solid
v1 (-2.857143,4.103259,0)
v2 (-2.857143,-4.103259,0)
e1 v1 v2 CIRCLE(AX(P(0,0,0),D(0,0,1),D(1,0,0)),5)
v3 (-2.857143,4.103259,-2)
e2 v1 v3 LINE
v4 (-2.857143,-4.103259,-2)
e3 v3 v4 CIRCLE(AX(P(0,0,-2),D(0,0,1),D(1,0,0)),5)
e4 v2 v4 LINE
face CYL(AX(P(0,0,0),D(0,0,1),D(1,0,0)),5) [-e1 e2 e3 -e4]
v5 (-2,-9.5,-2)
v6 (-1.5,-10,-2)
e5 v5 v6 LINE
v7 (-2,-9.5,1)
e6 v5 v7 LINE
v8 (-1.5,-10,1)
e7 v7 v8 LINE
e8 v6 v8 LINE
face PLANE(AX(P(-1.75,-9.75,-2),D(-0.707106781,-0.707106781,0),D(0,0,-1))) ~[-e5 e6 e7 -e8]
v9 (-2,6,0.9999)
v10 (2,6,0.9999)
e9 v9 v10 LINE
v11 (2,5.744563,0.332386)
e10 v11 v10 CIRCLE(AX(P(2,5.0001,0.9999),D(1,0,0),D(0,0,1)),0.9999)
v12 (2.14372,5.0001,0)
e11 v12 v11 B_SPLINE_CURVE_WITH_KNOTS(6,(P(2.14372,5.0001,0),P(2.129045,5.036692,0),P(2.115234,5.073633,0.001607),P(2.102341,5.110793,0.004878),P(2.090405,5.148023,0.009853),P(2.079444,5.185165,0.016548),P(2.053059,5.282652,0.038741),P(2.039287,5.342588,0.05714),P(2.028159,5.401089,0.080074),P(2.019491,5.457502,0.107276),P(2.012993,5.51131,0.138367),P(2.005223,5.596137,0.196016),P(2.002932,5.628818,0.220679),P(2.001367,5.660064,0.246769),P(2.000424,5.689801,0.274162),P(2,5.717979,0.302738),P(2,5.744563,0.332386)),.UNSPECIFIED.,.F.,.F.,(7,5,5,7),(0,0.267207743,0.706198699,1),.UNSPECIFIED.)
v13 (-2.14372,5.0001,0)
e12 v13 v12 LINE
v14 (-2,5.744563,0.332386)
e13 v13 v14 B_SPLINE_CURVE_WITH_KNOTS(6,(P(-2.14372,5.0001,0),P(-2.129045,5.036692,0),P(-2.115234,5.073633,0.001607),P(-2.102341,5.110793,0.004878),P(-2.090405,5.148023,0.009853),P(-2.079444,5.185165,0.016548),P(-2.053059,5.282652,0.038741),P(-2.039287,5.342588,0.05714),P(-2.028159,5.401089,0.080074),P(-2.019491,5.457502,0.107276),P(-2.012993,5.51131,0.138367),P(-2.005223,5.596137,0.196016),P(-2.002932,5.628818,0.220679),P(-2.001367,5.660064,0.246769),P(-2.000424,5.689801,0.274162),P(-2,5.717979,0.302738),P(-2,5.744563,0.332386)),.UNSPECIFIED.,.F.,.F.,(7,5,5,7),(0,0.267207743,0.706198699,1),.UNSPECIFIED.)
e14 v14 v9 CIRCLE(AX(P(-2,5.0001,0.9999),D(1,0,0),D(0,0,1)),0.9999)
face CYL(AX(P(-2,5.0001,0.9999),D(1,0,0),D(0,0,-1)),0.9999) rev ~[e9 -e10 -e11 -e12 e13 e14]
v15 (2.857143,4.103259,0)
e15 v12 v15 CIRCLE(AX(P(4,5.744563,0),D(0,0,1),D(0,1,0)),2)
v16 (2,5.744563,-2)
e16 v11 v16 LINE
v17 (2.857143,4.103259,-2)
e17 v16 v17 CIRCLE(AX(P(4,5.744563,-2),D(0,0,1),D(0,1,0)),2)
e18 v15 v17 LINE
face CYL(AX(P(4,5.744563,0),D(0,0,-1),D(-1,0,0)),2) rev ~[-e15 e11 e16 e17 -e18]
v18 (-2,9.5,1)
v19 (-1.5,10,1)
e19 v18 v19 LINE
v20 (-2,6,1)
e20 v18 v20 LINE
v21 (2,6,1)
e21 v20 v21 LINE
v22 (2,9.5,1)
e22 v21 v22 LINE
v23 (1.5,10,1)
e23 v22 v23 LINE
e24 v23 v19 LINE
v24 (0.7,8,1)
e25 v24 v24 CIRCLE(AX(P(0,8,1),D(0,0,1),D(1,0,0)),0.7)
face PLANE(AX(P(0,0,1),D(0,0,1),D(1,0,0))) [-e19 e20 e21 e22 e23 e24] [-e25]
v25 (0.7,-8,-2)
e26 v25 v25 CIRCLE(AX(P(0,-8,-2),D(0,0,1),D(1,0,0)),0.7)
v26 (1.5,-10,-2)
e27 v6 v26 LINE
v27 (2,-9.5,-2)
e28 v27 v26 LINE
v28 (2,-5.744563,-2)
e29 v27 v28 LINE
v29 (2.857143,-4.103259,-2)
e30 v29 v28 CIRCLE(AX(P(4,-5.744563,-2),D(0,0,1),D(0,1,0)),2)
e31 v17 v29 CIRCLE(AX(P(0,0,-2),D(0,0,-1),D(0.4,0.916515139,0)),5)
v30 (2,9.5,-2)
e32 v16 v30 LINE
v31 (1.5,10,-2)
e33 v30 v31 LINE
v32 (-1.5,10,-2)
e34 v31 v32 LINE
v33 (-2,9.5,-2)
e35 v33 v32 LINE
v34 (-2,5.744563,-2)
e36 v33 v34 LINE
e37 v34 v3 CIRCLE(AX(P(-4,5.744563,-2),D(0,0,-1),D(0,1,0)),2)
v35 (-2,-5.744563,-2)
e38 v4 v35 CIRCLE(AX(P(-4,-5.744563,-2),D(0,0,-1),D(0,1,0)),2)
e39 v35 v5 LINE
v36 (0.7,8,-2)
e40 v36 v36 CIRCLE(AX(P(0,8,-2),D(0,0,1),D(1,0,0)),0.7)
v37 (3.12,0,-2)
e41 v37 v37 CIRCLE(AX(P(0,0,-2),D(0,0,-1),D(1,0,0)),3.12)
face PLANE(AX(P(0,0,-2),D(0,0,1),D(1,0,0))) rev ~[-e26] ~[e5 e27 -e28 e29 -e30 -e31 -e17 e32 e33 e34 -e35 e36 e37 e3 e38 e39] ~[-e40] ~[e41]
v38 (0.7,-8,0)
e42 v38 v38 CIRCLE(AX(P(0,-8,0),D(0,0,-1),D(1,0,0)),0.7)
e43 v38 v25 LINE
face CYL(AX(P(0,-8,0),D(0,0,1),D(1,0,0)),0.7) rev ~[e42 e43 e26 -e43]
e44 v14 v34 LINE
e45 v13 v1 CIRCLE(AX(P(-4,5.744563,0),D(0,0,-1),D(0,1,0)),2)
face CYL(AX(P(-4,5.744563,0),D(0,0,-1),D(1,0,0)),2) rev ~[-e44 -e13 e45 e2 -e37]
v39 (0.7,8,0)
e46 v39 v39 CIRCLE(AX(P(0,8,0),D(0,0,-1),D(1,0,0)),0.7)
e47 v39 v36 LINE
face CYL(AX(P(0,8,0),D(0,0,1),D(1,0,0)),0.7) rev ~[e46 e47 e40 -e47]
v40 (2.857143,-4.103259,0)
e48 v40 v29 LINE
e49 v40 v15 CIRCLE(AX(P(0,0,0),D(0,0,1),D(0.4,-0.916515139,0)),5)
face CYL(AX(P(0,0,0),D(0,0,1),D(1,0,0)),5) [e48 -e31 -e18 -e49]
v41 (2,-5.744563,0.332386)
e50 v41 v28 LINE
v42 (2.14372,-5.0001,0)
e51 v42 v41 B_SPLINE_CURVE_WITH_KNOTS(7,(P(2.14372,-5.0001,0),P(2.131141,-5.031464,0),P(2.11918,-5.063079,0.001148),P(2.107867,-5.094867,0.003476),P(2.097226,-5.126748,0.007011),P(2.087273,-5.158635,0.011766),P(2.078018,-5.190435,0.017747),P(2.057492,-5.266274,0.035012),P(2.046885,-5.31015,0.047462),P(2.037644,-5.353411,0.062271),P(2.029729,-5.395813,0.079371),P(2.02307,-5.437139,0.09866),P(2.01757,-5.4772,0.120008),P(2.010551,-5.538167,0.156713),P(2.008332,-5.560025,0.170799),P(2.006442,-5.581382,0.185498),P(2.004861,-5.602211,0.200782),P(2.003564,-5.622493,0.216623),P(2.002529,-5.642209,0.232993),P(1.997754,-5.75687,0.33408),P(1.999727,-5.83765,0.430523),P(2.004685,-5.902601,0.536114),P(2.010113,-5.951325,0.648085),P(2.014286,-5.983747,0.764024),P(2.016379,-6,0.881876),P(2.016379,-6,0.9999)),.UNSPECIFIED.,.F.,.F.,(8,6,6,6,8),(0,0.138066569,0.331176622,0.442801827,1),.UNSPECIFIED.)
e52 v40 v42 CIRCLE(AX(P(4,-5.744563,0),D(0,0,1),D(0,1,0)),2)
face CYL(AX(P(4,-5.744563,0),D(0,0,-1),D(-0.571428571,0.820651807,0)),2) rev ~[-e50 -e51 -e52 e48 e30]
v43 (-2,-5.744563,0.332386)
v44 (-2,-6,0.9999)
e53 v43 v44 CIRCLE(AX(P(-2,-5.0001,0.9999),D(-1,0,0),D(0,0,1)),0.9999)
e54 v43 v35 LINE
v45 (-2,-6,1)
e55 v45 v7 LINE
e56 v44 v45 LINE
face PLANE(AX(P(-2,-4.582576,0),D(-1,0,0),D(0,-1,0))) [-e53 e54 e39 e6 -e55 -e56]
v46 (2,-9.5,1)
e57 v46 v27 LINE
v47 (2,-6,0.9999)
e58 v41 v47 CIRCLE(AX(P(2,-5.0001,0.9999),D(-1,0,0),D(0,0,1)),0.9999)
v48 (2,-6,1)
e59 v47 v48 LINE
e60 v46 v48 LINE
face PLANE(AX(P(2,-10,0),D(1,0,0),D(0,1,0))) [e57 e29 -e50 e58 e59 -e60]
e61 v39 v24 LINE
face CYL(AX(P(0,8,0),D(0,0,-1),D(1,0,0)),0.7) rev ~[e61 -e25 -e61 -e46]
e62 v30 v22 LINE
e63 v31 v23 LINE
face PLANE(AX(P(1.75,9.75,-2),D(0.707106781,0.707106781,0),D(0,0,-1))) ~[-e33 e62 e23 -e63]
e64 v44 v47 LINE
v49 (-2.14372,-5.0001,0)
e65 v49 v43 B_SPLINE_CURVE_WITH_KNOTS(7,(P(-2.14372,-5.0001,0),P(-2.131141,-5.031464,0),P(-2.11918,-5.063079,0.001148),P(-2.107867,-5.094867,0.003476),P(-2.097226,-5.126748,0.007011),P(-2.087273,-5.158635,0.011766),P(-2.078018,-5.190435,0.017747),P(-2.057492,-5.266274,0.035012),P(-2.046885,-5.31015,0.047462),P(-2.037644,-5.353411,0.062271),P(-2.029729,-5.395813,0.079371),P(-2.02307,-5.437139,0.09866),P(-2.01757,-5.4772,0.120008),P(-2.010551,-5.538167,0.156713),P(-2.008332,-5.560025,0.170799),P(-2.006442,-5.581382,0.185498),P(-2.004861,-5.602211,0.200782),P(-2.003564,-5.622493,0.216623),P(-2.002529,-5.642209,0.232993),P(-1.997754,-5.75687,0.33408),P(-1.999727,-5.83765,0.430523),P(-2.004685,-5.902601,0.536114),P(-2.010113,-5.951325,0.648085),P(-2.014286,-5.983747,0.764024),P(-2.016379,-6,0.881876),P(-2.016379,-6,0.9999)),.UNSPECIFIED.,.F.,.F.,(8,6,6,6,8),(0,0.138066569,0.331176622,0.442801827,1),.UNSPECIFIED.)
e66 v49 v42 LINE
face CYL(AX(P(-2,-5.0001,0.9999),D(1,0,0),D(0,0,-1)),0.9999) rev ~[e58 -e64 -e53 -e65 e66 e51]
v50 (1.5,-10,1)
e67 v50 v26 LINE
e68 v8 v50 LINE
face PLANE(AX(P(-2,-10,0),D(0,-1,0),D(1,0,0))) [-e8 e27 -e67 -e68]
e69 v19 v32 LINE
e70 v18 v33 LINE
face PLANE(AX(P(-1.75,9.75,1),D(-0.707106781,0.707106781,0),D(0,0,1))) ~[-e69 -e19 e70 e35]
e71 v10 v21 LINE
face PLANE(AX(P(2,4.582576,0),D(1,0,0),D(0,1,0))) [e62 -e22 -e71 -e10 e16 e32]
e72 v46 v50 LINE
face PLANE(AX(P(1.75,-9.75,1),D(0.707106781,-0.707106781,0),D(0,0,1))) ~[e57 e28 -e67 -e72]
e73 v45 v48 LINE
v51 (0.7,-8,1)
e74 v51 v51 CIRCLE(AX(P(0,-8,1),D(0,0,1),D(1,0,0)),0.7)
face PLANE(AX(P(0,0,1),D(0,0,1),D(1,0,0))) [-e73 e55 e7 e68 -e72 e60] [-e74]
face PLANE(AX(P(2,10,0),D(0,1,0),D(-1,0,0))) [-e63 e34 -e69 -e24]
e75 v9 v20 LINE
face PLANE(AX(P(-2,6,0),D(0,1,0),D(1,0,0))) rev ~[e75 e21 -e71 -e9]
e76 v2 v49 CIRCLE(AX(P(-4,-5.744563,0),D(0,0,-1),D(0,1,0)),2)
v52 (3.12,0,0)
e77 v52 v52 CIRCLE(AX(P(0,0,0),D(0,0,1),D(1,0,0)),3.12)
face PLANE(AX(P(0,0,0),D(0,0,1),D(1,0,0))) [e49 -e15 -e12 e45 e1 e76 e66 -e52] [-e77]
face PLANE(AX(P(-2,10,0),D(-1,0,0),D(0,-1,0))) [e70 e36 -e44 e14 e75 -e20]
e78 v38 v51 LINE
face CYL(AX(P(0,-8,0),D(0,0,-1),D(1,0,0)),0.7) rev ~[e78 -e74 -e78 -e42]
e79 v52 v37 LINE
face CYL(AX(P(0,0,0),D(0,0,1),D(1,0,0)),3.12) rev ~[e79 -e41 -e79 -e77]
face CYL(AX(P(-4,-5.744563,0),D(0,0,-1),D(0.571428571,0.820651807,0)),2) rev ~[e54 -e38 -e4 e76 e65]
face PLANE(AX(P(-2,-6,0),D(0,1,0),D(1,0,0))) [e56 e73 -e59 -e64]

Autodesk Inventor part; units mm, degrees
ref_plane "YZ Plane" through (0, 0, 0) normal (1, 0, 0) x (0, 1, 0)
ref_plane "XZ Plane" through (0, 0, 0) normal (0, 1, 0) x (-1, 0, 0)
ref_plane "XY Plane" through (0, 0, 0) normal (0, 0, 1) x (1, 0, 0)
sketch "Sketch1" plane through (0, 0, 0) normal (0, 0, 1) x (1, 0, 0)
  circle A0 centre (0, 0) radius 3 projected
  circle A1 centre (0, 0) radius 3
  circle A2 centre (0, 0) radius 5
  line L0 (0, 0) -> (0, 8)
  circle A3 centre (0, 8) radius 0.7
  line L1 (0, 0) -> (0, -8)
  circle A4 centre (0, -8) radius 0.7
  line L2 (-2, -10) -> (2, -10)
  line L3 (2, -10) -> (2, 10)
  line L4 (2, 10) -> (-2, 10)
  line L5 (-2, 10) -> (-2, -10)
  line L6 (-2, -10) -> (2, 10) construction
  line L7 (2, -10) -> (-2, 10) construction
  point P0 (-2, -4.5826)
  point P1 (2, -4.5826)
  point P2 (2, 4.5826)
  point P3 (-2, 4.5826)
  dimension "d0" = 6
  dimension "d1" = 10
  dimension "d2" = 8
  dimension "d3" = 1.4
  dimension "d4" = 8
  dimension "d5" = 1.4
  dimension "d6" = 4
  dimension "d7" = 20
extrude "Extrusion1" add sketch "Sketch1" against normal blind 2 contours A0 L3 A2 | A0 L0 A2 L3 | L3 A2 L1 A0 | A0 L5 A2 L0 | A2 L5 L4 L3 | L1 A2 L5 A0 | L3 L2 L5 A2 | A0 L5 A2
sketch "Sketch2" plane through (0, 0, 0) normal (0, 0, 1) x (1, 0, 0)
  arc A0 (-2, 4.5826) -> (-2, -4.5826) centre (0, 0) ccw projected
  line L0 (-2, -4.5826) -> (-2, -10) projected
  line L1 (-2, -10) -> (2, -10) projected
  line L2 (2, -10) -> (2, -4.5826) projected
  arc A1 (2, -4.5826) -> (2, 4.5826) centre (0, 0) ccw projected
  line L3 (2, 4.5826) -> (2, 10) projected
  line L4 (2, 10) -> (-2, 10) projected
  line L5 (-2, 10) -> (-2, 4.5826) projected
  circle A2 centre (0, -8) radius 0.7 projected
  circle A3 centre (0, 8) radius 0.7 projected
  circle A4 centre (0, 0) radius 3 projected
  line L6 (-2, -10) -> (-2, -4.5826) projected
  line L7 (-2, -10) -> (-2, -6)
  line L8 (-2, -6) -> (2, -6)
  line L9 (2, -10) -> (2, -4.5826) projected
  line L10 (-2, 10) -> (-2, 4.5826) projected
  line L11 (-2, 10) -> (-2, 6)
  line L12 (-2, 6) -> (2, 6)
  line L13 (2, 10) -> (2, 4.5826) projected
  point P0 (2, 6)
  dimension "d10" = 4
  dimension "d11" = 4
extrude "Extrusion2" add sketch "Sketch2" along normal blind 1 contours L5 L4 L3 L12 | L8 L2 L1 L0
ref_plane "Work Plane1" through (0, -10, -2) normal (1, 0, 0) x (0, 0, -1)
chamfer "Chamfer1" distance 0.5 angle 45 4 edges at (-2, -10, -0.5) (2, -10, -0.5) (-2, 10, -0.5) (2, 10, -0.5)
fillet "Fillet1" radius 2 4 edges at (-2, -4.5826, -1) (-2, 4.5826, -1) (2, 4.5826, -1) (2, -4.5826, -1)
fillet "Fillet2" radius 1 2 edges at (0, -6, 0) (0, 6, 0)
thicken "Thicken1" operation add thickness 0.12 both sides no extend neighbours yes toward (0.9967573, -0.0804666, 0) faces at (2.9903, -0.2414, -1.3333)
properties part number "bearing_hh_1"
